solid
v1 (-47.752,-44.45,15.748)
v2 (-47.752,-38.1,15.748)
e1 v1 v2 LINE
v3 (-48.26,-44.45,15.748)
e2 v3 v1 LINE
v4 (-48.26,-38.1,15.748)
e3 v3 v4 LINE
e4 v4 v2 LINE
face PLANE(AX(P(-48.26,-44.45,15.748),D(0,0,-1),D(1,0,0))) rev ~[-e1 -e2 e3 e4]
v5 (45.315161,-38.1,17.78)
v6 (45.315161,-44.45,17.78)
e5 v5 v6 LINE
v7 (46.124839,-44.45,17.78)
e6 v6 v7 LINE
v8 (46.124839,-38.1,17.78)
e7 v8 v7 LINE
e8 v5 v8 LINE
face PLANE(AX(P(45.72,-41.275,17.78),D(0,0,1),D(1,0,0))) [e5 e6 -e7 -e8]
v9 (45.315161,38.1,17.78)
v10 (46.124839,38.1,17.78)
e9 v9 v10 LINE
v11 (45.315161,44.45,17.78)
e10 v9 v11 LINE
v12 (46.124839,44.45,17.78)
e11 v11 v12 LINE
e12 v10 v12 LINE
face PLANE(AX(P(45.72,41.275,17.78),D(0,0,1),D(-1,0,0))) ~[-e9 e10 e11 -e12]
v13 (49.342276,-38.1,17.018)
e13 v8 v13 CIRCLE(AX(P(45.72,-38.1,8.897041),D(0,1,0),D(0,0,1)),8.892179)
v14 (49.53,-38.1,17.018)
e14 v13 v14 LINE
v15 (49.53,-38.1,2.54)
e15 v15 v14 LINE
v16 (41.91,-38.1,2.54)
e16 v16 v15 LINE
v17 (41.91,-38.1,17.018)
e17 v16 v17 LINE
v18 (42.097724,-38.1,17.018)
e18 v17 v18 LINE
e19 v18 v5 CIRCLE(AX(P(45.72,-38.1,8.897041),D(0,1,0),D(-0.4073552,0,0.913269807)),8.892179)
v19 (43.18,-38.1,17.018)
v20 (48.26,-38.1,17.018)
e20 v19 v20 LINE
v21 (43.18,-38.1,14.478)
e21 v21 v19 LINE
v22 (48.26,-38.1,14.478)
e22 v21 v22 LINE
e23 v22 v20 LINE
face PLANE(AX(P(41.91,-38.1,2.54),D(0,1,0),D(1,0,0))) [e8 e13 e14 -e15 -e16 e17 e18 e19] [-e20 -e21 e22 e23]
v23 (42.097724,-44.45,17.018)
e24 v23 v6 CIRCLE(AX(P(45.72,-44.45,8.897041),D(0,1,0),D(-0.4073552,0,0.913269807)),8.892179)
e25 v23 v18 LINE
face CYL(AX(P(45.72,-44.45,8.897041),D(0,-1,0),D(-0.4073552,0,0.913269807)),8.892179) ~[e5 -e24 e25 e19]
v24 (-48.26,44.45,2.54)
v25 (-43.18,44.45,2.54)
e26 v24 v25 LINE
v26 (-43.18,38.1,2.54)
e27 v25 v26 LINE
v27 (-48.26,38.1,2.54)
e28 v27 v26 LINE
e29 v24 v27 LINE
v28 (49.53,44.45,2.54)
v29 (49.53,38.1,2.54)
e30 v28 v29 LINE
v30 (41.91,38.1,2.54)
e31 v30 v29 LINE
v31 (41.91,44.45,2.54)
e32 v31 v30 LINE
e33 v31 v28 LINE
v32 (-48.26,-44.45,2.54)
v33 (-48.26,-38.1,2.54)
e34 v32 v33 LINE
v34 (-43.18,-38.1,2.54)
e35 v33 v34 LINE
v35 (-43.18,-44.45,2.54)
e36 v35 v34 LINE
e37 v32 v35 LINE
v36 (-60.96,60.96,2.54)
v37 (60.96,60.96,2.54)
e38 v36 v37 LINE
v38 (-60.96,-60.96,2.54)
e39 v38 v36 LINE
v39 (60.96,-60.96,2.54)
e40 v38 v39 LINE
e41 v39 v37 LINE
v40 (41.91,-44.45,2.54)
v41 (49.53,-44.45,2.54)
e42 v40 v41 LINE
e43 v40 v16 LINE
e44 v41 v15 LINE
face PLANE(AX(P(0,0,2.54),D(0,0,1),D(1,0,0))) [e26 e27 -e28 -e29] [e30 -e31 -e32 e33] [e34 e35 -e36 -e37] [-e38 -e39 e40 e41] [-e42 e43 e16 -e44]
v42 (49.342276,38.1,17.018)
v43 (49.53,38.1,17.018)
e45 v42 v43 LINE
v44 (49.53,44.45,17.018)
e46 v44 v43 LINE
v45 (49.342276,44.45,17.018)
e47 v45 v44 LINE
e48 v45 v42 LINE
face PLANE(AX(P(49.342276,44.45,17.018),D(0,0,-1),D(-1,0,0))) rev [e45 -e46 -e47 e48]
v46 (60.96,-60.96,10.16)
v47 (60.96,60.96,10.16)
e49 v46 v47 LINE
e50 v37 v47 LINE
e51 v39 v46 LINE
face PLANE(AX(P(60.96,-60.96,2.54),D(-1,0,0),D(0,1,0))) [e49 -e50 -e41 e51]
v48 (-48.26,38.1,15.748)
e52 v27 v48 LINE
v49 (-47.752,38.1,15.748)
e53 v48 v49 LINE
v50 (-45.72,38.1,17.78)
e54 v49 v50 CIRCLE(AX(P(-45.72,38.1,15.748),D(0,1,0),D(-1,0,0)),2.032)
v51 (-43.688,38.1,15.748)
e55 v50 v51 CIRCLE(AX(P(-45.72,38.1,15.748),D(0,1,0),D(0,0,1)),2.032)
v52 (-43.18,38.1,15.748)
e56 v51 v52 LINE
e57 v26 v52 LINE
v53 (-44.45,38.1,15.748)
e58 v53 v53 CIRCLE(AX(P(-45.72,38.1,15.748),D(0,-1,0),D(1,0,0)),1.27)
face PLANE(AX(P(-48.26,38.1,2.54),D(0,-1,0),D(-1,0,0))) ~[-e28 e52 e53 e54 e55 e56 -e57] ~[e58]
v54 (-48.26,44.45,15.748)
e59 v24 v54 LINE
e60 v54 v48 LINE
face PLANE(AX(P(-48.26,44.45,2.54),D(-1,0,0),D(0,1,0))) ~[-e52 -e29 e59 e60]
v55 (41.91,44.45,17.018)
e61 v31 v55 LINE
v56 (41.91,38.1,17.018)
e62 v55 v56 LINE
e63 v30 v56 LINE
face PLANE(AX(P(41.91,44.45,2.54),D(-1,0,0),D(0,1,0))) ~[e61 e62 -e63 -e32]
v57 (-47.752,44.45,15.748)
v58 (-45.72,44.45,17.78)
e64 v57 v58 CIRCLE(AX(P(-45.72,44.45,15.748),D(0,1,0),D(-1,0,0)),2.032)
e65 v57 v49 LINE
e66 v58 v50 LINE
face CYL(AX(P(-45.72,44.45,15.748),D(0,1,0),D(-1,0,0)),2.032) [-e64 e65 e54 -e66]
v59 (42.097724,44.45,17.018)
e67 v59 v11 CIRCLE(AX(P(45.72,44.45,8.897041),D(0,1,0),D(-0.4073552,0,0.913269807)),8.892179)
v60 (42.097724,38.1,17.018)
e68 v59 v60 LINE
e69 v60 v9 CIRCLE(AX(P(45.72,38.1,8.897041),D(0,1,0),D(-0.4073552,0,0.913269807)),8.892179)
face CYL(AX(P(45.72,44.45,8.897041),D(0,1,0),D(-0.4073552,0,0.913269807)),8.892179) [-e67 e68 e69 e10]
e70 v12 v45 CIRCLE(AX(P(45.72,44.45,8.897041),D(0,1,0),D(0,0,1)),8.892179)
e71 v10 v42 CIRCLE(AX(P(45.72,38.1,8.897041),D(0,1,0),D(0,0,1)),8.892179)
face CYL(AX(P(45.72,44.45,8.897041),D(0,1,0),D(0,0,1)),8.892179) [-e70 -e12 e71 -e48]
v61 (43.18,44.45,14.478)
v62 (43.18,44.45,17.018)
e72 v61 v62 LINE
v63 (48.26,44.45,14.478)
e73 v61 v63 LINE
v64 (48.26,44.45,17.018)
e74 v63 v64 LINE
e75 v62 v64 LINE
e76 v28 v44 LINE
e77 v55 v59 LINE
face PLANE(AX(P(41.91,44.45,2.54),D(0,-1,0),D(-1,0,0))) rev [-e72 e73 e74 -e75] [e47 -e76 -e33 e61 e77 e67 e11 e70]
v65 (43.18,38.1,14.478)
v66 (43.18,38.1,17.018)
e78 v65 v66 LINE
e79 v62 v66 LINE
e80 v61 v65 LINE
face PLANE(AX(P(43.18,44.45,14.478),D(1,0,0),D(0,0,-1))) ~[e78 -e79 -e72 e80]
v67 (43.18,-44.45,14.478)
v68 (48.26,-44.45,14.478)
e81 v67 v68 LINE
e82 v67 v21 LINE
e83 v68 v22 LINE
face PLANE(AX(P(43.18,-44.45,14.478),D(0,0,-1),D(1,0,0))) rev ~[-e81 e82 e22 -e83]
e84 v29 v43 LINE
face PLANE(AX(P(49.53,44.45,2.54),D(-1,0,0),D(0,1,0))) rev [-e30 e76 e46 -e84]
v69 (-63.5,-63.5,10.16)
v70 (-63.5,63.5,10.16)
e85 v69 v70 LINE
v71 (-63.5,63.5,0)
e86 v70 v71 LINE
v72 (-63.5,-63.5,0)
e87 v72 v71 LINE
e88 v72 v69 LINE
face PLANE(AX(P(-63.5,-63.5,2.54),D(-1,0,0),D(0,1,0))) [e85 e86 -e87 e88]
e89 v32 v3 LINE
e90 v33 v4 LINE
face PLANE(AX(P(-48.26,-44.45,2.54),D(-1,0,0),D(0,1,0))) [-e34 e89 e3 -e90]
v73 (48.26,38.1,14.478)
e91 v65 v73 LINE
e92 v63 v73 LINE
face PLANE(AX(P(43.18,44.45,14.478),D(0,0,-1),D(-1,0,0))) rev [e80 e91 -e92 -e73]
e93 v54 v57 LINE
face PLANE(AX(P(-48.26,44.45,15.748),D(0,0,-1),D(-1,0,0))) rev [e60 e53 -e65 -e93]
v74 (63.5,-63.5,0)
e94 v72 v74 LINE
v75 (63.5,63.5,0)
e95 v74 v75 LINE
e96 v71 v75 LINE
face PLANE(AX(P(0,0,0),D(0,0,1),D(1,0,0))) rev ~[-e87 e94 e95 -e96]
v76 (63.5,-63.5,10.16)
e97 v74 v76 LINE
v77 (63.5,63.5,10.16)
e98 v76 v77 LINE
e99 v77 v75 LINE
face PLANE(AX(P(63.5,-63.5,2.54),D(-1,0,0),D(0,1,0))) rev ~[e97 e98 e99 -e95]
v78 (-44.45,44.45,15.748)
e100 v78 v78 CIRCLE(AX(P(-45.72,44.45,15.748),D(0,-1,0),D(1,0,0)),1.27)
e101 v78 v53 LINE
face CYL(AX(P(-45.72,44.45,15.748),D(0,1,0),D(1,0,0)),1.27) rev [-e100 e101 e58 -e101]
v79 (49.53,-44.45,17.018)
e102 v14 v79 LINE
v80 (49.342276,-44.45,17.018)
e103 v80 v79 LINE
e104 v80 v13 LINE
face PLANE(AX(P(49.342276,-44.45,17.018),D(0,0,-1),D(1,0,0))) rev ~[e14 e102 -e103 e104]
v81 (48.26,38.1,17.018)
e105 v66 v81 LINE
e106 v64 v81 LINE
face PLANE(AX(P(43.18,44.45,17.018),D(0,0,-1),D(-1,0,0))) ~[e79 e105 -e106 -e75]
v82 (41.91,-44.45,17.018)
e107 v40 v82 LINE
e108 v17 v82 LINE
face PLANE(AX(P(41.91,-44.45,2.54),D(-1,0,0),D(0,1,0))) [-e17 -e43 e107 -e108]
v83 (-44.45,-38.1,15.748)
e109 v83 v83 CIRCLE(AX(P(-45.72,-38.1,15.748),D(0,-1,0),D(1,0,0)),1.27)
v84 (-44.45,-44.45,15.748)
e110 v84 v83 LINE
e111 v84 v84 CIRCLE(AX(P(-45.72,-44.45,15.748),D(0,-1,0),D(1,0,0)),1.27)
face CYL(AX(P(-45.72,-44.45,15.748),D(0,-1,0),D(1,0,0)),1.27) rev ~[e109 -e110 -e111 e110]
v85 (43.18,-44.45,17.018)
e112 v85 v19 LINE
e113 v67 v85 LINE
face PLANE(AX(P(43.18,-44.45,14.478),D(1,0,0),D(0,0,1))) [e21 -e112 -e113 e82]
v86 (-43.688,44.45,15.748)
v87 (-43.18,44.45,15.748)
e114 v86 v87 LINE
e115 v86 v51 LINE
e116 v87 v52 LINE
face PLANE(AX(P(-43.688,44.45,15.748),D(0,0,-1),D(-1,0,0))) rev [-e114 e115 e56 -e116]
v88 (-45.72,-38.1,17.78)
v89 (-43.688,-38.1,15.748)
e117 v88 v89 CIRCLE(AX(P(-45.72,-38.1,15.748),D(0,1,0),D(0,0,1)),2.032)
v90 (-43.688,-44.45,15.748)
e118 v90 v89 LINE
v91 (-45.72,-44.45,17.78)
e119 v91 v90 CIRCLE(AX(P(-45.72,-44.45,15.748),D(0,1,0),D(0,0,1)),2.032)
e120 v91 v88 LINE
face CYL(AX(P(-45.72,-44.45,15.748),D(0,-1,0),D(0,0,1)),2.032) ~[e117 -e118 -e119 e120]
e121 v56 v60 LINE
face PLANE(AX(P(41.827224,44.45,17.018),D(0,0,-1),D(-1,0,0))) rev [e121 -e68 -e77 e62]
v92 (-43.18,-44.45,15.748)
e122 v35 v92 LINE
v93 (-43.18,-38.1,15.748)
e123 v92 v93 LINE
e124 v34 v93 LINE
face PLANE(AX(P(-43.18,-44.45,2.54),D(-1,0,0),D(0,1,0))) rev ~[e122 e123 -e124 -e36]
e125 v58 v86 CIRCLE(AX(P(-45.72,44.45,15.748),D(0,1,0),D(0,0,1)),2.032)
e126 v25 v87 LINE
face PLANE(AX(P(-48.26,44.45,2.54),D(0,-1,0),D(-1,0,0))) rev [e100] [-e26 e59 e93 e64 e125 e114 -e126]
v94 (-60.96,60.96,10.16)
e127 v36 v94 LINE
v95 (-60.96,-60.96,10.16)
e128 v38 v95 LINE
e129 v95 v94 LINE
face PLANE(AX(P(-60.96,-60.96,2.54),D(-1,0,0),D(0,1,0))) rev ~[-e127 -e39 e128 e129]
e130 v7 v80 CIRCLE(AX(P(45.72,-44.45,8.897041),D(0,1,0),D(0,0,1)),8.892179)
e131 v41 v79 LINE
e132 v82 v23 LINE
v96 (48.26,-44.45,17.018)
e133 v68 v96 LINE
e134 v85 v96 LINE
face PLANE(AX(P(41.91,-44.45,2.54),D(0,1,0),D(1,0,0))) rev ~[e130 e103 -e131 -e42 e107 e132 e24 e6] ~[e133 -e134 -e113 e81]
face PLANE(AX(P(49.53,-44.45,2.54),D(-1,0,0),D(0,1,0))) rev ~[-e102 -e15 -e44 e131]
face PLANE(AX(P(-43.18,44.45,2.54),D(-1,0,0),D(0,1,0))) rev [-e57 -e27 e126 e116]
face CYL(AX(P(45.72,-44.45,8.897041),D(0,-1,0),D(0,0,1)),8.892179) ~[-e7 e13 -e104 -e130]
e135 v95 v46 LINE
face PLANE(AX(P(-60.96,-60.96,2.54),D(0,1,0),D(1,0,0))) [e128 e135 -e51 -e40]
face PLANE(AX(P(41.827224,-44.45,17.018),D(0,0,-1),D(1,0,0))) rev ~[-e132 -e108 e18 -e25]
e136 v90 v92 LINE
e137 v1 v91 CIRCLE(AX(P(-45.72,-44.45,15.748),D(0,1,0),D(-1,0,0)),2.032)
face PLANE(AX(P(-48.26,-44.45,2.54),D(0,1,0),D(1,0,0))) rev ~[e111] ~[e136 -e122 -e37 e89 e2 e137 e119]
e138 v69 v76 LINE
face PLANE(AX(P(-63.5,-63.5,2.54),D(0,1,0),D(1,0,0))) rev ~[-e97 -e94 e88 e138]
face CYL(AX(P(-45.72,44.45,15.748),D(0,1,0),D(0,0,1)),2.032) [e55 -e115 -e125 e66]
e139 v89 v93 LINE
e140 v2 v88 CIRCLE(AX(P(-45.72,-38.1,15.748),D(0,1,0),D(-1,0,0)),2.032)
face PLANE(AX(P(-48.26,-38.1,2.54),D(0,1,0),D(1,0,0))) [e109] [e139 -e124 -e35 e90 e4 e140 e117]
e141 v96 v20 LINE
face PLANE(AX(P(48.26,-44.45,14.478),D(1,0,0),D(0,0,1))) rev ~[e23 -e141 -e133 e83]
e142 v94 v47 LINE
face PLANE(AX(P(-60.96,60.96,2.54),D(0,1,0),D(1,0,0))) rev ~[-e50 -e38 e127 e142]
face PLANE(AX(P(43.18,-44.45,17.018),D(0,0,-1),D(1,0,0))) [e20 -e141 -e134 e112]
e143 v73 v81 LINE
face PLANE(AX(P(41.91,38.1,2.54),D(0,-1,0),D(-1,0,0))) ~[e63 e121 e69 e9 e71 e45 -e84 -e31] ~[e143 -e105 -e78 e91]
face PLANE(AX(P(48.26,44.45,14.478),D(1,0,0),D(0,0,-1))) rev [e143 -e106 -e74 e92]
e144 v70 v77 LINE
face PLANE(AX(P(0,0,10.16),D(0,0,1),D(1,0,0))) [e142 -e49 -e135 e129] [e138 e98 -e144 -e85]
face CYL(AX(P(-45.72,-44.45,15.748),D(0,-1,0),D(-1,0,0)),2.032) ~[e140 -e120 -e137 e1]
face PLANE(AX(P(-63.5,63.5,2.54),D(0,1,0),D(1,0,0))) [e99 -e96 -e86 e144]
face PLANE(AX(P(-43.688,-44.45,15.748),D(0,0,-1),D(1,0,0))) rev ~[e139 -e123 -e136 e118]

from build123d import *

# Parameters (mm, degrees)
F0_W     = 127
F0_H     = 127
F1_DEPTH = 2.54
F2_W     = 127
F2_H     = 127
F2_W_2   = 121.92
F2_H_2   = 121.92
F3_DEPTH = 7.62
F4_W     = 5.08
F4_H     = 6.35
F4_W_2   = 7.62
F5_DEPTH = 15.24
F6_R     = 1.27
F6_W     = 5.08
F6_H     = 2.54
F7_DEPTH = 6.35


# Not quite as in the source:
# - a pattern or mirror of a feature is missing from the dataset's text; its kind, count and spacing are read off the source's solid


with BuildPart() as f1:
    # F0 (on Top) → F1 (new body)
    with BuildSketch(Plane.XY):
        Rectangle(F0_W, F0_H)
    extrude(amount=F1_DEPTH)

    # F2 (on face) → F3 (join)
    with BuildSketch(Plane.XY.offset(2.54)):
        Rectangle(F2_W, F2_H)
        Rectangle(F2_W_2, F2_H_2, mode=Mode.SUBTRACT)
    extrude(amount=F3_DEPTH)

    # F4 (on face) → F5 (join)
    with BuildSketch(Plane.XY.offset(2.54)):
        with Locations((-45.72, -41.275)):
            Rectangle(F4_W, F4_H)
        with Locations((45.72, -41.275)):
            Rectangle(F4_W_2, F4_H)
    f5 = extrude(amount=F5_DEPTH)

    # F5_copies: F5 across plane
    add(f5.mirror(Plane.ZX))

    # F6 (on face) → F7 (cut)
    with BuildSketch(Plane.XZ.offset(44.45)):
        with Locations((-45.72, 15.748)):
            Circle(F6_R)
        with Locations((45.72, 15.748)):
            Rectangle(F6_W, F6_H)
        with BuildLine():
            Line((-43.18, 17.78), (-45.72, 17.78))
            ThreePointArc((-45.72, 17.78), (-44.2831590206, 17.1848409794), (-43.688, 15.748))
            Line((-43.688, 15.748), (-43.18, 15.748))
            Line((-43.18, 15.748), (-43.18, 17.78))
        make_face()
        with BuildLine():
            ThreePointArc((-47.752, 15.748), (-47.1568409794, 17.1848409794), (-45.72, 17.78))
            Line((-45.72, 17.78), (-48.26, 17.78))
            Line((-48.26, 17.78), (-48.26, 15.748))
            Line((-48.26, 15.748), (-47.752, 15.748))
        make_face()
        with BuildLine():
            Line((49.7070066631, 17.7892204374), (45.72, 17.7892204374))
            ThreePointArc((45.72, 17.7892204374), (47.5717330447, 17.5942784861), (49.3422755435, 17.018))
            Line((49.3422755435, 17.018), (49.7070066631, 17.018))
            Line((49.7070066631, 17.018), (49.7070066631, 17.7892204374))
        make_face()
        with BuildLine():
            ThreePointArc((42.0977244565, 17.018), (43.8682669553, 17.5942784861), (45.72, 17.7892204374))
            Line((45.72, 17.7892204374), (41.827224195, 17.7892204374))
            Line((41.827224195, 17.7892204374), (41.827224195, 17.018))
            Line((41.827224195, 17.018), (42.0977244565, 17.018))
        make_face()
    f7 = extrude(amount=-F7_DEPTH, mode=Mode.SUBTRACT)

    # F7_copies: F7 across plane
    add(f7.mirror(Plane.ZX), mode=Mode.SUBTRACT)


solid = f1.part
